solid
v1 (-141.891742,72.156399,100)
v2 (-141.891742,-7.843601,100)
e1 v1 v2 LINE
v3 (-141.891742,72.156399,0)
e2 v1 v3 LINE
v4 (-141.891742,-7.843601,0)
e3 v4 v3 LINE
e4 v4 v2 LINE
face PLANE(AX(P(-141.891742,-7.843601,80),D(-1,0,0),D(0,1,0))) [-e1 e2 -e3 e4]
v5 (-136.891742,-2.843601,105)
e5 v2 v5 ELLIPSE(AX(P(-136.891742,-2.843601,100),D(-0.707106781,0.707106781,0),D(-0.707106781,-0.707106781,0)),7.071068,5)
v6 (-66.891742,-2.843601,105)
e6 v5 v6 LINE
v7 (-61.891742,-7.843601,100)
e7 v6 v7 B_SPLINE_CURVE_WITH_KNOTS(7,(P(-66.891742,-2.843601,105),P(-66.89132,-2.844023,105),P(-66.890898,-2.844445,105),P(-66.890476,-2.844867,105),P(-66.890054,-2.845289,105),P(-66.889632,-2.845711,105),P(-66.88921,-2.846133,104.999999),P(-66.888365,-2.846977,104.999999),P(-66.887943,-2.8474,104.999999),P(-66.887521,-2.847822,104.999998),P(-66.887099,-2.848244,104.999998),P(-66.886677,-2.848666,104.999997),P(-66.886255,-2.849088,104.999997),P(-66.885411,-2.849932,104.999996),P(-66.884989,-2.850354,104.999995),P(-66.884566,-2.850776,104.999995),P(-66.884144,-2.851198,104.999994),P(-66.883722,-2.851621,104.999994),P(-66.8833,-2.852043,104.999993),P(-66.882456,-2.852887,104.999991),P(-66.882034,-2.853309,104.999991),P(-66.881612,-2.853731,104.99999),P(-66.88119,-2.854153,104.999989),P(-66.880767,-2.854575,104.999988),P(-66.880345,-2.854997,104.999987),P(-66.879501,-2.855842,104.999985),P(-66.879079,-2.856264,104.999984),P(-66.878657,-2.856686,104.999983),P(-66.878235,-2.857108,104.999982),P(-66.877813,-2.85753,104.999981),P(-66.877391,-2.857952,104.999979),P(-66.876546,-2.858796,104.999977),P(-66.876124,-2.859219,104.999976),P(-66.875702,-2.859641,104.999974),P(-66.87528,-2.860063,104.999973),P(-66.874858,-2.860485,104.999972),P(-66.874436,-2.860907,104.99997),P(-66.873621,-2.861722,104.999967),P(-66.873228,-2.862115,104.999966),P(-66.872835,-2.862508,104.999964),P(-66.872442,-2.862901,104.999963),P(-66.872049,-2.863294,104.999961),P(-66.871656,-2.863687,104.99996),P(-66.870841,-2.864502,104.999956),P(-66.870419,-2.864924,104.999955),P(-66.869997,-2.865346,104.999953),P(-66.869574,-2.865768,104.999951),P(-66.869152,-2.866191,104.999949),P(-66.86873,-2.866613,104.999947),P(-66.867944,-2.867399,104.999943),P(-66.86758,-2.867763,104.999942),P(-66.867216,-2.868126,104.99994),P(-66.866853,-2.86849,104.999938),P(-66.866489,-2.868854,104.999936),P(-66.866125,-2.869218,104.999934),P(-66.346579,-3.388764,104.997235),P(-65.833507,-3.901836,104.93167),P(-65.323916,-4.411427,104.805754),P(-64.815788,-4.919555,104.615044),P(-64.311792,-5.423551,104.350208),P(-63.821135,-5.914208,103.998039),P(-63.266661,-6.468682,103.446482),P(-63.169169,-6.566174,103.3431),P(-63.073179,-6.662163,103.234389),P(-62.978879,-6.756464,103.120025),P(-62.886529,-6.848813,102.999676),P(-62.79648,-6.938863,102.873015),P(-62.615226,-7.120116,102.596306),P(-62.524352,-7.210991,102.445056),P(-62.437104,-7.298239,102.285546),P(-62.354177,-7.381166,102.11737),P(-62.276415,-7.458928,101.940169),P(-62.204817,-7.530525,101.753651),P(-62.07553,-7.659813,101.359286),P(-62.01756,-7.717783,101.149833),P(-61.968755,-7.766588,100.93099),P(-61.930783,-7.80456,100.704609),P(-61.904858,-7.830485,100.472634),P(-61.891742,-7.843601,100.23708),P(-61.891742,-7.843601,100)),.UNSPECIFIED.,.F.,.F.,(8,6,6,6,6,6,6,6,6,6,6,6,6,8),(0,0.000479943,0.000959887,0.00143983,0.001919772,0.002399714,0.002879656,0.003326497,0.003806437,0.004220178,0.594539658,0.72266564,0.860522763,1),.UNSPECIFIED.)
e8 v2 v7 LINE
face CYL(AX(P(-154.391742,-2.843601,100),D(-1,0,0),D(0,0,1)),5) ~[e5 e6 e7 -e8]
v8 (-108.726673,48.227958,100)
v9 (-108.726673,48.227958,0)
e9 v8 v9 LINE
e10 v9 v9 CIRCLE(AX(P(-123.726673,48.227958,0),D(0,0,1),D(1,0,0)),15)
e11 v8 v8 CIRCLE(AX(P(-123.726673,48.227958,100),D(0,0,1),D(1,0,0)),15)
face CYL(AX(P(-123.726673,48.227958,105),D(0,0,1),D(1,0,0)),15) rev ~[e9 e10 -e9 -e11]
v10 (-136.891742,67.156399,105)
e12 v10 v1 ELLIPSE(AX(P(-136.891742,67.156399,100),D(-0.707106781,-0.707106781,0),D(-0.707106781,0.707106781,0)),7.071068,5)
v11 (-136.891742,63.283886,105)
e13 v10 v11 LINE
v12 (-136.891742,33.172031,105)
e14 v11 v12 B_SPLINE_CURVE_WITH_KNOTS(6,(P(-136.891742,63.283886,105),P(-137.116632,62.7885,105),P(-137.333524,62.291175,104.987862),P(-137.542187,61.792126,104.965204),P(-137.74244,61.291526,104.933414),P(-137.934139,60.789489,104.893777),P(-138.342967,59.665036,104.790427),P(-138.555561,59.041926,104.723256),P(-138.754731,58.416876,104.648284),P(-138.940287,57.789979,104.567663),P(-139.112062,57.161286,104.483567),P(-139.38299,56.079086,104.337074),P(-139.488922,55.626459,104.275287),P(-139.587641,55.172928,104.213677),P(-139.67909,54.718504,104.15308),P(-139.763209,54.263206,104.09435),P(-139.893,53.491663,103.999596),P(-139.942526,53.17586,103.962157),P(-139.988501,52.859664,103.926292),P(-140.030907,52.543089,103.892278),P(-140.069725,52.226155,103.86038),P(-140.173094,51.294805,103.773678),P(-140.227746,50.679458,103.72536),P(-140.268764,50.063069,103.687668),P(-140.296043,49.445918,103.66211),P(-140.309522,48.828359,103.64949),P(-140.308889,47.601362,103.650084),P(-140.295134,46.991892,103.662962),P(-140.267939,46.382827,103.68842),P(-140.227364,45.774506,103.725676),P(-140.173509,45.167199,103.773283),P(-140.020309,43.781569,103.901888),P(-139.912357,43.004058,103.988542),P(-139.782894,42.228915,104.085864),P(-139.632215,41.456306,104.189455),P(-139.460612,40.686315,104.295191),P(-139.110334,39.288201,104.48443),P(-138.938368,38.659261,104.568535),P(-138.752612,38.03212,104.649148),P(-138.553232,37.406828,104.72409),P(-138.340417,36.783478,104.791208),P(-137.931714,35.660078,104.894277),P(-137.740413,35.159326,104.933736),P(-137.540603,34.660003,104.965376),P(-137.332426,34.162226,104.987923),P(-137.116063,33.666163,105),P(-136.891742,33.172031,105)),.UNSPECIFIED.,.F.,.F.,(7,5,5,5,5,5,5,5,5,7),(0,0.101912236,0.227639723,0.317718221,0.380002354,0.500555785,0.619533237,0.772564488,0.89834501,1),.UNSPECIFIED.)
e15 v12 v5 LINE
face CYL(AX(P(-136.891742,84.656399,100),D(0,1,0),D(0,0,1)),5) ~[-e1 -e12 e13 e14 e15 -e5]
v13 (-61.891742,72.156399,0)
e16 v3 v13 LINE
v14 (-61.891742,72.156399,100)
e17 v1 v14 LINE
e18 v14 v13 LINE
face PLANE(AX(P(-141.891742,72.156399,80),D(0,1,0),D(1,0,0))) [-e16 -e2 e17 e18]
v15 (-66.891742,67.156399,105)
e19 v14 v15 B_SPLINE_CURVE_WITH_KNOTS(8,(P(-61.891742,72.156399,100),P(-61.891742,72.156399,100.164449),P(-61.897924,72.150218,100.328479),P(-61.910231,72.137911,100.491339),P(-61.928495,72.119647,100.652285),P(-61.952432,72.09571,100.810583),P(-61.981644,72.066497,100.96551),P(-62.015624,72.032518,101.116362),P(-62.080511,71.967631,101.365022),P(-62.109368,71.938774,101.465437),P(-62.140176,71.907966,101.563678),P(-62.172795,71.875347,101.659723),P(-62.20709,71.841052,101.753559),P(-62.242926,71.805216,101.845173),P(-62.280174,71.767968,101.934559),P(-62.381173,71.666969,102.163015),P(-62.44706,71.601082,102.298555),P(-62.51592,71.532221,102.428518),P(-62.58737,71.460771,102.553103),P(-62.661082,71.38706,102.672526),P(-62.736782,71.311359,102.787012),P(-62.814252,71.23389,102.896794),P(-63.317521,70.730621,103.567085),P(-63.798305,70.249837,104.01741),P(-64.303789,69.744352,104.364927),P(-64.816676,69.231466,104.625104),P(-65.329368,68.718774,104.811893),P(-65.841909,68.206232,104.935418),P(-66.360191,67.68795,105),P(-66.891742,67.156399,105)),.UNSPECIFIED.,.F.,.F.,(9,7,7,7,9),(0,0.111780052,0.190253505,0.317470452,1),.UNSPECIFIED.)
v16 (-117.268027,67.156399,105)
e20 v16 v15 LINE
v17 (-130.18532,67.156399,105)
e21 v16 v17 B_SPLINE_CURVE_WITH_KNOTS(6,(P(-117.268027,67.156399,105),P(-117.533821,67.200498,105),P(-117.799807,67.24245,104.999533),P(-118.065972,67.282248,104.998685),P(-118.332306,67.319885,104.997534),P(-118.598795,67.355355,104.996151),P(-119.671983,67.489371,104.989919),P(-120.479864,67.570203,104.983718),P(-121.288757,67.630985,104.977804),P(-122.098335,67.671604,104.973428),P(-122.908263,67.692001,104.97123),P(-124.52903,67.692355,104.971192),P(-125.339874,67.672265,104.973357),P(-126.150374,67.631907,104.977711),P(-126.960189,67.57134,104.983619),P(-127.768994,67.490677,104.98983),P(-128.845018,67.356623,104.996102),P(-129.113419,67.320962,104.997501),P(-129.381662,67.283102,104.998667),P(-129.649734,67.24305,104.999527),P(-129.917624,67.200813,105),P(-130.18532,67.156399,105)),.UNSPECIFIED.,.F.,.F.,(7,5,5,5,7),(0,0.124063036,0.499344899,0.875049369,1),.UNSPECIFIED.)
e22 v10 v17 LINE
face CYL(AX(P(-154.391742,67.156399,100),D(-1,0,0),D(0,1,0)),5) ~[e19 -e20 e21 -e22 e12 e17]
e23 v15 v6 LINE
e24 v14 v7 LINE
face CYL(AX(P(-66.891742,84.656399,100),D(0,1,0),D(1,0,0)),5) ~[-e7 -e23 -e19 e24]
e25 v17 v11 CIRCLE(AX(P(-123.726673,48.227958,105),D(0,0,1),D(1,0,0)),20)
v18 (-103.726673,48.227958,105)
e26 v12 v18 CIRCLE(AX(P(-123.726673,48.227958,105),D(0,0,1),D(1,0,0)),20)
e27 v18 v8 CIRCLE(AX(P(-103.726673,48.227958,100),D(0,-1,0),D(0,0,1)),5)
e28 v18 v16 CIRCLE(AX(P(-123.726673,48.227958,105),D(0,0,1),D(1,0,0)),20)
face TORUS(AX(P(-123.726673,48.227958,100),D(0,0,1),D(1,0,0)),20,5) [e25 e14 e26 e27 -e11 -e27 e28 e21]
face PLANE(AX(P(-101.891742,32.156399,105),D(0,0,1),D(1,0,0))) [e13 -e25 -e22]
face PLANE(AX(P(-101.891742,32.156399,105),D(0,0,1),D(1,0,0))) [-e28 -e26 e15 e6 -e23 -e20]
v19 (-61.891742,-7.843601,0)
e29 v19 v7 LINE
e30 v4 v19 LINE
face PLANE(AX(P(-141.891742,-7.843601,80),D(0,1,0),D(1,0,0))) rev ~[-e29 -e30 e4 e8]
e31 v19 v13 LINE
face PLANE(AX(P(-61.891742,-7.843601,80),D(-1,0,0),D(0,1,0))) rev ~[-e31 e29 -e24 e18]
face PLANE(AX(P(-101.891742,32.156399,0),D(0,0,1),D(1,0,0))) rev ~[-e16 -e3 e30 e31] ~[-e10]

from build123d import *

# Parameters (mm, degrees)
F0_W        = 80
F0_H        = 80
F1_DEPTH    = 80
F2_DEPTH    = 25
F3_R        = 15
F4_DEPTH    = 105.001
F5_T1_DEPTH = 105
F5_T3_DEPTH = 105


# Not quite as in the source:
# - a fillet or chamfer that OpenCascade refuses, or shapes differently, is made with other operations: its cross-section is extruded or revolved along the edge and cut away or added


with BuildPart() as f1:
    # F0 (on Top) → F1 (new body)
    with BuildSketch(Plane.XY):
        with Locations((-101.8917422961, 32.1563994512)):
            Rectangle(F0_W, F0_H)
    extrude(amount=F1_DEPTH)

    # F2 (add): a face of the model
    f2_faces = [f1.faces().sort_by_distance(p)[0] for p in [
        (-101.8917422961, 32.1563994512, 80),
    ]]
    extrude(f2_faces, amount=F2_DEPTH)

    # F3 (on face) → F4 (cut, through all)
    with BuildSketch(Plane.XY.offset(105)):
        with Locations((-123.7266734242, 48.2279583812)):
            Circle(F3_R)
    extrude(amount=-F4_DEPTH, mode=Mode.SUBTRACT)

    # F5: fillet of radius 5 on 5 edges, made by hand

    # F5_s2 → F5_t1 (cut)
    with BuildSketch(Plane.YZ.offset(-154.3917422961)):
        with BuildLine():
            ThreePointArc((72.1563994512, 100), (70.6919333571, 103.5355339059), (67.1563994512, 105))
            Line((67.1563994512, 105), (72.1563994512, 105))
            Line((72.1563994512, 105), (72.1563994512, 100))
        make_face()
        with BuildLine():
            ThreePointArc((-2.8436005488, 105), (-6.3791344547, 103.5355339059), (-7.8436005488, 100))
            Line((-7.8436005488, 100), (-7.8436005488, 105))
            Line((-7.8436005488, 105), (-2.8436005488, 105))
        make_face()
    extrude(amount=F5_T1_DEPTH, mode=Mode.SUBTRACT)

    # F5_s4 → F5_t3 (cut)
    with BuildSketch(Plane.XZ.offset(-84.6563994512)):
        with BuildLine():
            ThreePointArc((-61.8917422961, 100), (-63.3562083901, 103.5355339059), (-66.8917422961, 105))
            Line((-66.8917422961, 105), (-61.8917422961, 105))
            Line((-61.8917422961, 105), (-61.8917422961, 100))
        make_face()
        with BuildLine():
            ThreePointArc((-136.8917422961, 105), (-140.427276202, 103.5355339059), (-141.8917422961, 100))
            Line((-141.8917422961, 100), (-141.8917422961, 105))
            Line((-141.8917422961, 105), (-136.8917422961, 105))
        make_face()
    extrude(amount=F5_T3_DEPTH, mode=Mode.SUBTRACT)

    # F5_s5 → F5_t6 (revolve, cut)
    with BuildSketch(Plane.XZ.offset(-48.2279583812)):
        with BuildLine():
            ThreePointArc((-103.7266734242, 105), (-107.2622073302, 103.5355339059), (-108.7266734242, 100))
            Line((-108.7266734242, 100), (-108.7266734242, 105))
            Line((-108.7266734242, 105), (-103.7266734242, 105))
        make_face()
    revolve(axis=Axis((-123.7266734242, 48.2279583812, 105), (0, 0, 1)), mode=Mode.SUBTRACT)


solid = f1.part
